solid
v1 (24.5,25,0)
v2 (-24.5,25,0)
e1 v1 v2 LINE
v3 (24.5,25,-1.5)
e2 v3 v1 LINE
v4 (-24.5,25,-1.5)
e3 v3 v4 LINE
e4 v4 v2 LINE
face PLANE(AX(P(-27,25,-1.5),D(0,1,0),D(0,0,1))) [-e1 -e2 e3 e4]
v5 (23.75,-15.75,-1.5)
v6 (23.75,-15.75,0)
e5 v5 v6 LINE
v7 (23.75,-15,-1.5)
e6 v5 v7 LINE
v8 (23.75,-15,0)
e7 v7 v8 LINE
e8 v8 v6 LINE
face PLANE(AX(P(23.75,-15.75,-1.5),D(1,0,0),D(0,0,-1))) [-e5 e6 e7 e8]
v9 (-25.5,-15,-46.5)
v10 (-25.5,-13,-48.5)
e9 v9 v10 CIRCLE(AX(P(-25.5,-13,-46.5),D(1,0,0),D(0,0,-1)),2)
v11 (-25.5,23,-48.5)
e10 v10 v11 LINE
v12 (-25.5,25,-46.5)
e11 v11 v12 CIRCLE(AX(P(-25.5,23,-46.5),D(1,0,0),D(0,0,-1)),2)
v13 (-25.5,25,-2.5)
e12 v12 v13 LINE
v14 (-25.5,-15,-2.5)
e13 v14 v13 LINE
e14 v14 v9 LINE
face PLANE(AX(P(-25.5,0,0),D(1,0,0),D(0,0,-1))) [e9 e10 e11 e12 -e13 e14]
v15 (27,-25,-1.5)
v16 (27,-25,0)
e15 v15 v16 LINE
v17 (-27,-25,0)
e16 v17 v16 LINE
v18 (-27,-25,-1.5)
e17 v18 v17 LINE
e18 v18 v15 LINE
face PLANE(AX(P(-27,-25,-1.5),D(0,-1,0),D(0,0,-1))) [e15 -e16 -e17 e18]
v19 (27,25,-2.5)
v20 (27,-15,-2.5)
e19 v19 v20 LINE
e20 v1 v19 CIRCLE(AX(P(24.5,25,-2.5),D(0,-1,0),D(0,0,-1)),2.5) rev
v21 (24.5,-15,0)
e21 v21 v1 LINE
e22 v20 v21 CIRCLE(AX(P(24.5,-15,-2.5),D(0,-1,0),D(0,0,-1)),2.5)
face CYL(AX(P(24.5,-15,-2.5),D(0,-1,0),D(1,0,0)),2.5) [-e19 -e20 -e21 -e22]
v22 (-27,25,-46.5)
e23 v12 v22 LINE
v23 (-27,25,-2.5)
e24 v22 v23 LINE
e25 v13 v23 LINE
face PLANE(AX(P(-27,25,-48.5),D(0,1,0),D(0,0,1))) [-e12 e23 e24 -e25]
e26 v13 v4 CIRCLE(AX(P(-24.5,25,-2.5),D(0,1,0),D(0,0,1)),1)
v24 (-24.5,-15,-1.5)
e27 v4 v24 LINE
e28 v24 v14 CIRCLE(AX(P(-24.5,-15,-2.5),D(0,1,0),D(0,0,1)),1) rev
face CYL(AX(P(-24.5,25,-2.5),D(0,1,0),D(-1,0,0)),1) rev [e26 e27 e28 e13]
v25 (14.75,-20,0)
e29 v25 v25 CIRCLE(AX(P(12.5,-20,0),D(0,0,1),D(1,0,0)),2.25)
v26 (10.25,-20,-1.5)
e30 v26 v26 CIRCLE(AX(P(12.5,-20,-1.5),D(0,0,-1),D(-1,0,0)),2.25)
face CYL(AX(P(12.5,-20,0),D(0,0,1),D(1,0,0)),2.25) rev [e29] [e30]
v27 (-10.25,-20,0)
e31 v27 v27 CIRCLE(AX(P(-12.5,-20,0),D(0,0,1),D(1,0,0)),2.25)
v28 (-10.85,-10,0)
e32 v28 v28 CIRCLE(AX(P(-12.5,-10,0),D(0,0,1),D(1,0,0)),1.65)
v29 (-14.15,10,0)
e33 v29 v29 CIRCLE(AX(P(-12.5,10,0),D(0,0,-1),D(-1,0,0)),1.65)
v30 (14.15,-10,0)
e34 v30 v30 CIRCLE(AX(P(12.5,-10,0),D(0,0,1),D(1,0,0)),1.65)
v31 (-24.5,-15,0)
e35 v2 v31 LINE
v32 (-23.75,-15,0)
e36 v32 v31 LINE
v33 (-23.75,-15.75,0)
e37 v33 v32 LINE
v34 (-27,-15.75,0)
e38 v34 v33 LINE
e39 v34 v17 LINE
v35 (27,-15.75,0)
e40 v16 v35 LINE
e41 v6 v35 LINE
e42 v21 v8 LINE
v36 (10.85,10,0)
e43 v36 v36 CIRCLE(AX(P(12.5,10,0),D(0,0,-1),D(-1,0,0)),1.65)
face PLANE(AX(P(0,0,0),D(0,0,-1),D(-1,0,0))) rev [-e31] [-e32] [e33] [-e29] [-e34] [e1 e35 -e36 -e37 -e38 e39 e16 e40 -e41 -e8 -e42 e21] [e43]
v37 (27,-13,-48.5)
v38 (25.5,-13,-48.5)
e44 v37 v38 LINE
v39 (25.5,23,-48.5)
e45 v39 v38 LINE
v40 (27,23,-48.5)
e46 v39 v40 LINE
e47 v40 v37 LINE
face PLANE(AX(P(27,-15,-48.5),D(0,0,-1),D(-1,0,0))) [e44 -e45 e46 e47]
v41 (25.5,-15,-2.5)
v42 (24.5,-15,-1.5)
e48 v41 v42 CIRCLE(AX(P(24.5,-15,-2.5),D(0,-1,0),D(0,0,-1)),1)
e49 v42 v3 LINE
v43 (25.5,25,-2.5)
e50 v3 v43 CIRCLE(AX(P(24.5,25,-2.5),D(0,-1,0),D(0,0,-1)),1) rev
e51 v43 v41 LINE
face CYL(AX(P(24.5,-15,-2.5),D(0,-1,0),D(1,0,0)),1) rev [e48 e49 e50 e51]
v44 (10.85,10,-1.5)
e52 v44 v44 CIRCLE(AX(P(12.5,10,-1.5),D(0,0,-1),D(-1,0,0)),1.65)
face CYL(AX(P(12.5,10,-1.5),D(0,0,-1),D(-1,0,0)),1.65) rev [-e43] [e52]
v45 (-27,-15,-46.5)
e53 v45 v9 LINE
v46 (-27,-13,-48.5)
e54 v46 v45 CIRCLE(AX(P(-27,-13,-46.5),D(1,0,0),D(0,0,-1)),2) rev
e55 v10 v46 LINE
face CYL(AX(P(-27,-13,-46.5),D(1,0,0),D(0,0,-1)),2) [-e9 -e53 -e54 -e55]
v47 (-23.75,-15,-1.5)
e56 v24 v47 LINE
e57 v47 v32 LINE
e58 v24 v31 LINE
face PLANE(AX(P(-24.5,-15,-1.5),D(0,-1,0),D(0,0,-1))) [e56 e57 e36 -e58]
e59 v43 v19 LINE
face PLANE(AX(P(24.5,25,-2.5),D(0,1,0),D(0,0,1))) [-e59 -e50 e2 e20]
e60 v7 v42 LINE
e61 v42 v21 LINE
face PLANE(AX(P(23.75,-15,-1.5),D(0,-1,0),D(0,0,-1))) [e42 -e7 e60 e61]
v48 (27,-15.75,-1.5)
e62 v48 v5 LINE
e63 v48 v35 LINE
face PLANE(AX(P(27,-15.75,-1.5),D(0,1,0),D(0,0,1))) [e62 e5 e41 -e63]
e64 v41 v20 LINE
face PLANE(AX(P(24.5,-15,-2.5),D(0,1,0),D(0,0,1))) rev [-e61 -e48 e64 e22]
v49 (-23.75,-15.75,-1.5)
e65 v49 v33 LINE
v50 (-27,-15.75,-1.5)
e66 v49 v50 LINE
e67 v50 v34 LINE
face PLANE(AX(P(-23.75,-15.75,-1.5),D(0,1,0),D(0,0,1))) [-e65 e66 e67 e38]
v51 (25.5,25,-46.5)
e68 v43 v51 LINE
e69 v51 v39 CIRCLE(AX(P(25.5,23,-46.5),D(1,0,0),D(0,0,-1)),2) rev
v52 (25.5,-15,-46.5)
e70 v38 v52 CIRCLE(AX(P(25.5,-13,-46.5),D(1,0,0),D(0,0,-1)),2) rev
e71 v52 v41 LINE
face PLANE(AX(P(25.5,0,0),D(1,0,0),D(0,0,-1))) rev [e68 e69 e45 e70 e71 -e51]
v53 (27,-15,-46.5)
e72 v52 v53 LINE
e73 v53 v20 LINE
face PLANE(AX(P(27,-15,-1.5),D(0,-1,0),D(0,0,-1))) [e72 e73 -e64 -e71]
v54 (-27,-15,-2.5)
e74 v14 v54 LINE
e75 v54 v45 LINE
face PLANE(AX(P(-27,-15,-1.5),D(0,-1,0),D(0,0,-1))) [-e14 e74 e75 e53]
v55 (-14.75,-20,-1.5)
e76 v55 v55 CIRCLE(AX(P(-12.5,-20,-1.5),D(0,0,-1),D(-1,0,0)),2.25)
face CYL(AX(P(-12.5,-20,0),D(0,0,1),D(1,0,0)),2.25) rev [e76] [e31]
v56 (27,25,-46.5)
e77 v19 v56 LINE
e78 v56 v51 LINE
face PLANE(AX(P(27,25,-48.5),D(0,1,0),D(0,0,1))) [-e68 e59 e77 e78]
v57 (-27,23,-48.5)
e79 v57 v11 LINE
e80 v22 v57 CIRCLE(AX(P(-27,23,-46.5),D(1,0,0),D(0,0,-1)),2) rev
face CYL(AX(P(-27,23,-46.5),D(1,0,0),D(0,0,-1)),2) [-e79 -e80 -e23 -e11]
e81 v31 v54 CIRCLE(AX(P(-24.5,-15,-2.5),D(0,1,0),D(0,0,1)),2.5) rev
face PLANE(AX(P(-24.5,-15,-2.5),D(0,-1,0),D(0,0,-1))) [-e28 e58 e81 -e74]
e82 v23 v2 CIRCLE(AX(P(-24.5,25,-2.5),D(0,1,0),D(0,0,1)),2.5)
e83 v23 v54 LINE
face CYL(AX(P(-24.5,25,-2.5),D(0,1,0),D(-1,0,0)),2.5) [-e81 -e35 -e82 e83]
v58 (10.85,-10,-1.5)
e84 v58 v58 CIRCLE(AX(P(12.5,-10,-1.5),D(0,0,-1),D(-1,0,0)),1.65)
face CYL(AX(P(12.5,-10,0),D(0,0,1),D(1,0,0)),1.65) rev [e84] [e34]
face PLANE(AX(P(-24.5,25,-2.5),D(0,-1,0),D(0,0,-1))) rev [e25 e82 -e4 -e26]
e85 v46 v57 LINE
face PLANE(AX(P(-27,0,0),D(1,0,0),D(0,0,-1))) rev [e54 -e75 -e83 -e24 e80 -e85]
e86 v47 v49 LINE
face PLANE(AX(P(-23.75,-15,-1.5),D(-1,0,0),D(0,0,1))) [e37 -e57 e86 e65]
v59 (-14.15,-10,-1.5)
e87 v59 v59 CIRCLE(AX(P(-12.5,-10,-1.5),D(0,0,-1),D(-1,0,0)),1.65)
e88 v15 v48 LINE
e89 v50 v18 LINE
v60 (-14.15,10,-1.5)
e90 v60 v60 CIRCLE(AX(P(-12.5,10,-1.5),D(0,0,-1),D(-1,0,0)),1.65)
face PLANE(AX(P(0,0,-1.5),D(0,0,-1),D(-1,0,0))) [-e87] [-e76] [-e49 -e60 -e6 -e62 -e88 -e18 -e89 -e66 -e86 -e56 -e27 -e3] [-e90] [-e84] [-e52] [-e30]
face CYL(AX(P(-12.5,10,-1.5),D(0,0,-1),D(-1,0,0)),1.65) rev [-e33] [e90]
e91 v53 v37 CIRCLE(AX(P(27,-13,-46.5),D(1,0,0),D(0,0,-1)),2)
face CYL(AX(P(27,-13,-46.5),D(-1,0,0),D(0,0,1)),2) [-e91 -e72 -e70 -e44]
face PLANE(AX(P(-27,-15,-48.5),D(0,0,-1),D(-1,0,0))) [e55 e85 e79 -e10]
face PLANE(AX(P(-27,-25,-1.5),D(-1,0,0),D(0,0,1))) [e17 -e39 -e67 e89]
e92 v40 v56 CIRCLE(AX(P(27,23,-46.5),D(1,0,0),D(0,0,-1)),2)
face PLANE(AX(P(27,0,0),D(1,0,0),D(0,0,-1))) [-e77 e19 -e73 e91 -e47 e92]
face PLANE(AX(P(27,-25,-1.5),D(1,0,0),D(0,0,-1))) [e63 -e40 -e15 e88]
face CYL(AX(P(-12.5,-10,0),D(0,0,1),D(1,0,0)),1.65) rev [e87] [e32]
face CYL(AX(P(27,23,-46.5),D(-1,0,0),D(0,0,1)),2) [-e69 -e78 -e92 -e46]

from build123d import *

# Parameters (mm, degrees)
SKETCH_1_W                          = 54
SKETCH_1_H                          = 50
SM_BASE_FLANGE_1_DEPTH              = 1.5
SM_EDGE_FLANGE_1_STRIP_W            = 8
SM_EDGE_FLANGE_1_STRIP_H            = 1.5
SM_EDGE_FLANGE_1_STRIP_CUT_DEPTH    = 40
SM_EDGE_FLANGE_1_RELIEF_W           = 8.75
SM_EDGE_FLANGE_1_RELIEF_H           = 0.75
SM_EDGE_FLANGE_1_RELIEF_CUT_DEPTH   = 1.5
SM_EDGE_FLANGE_1_STRIP_2_W          = 8
SM_EDGE_FLANGE_1_STRIP_2_H          = 1.5
SM_EDGE_FLANGE_1_STRIP_CUT_2_DEPTH  = 40
SM_EDGE_FLANGE_1_RELIEF_2_W         = 8.75
SM_EDGE_FLANGE_1_RELIEF_2_H         = 0.75
SM_EDGE_FLANGE_1_RELIEF_CUT_2_DEPTH = 1.5
SM_EDGE_FLANGE_1_DEPTH              = 40
SM_EDGE_FLANGE_1_BEND_DEPTH         = 40
HOLE_WIZARD_M4_1_D                  = 4.5
HOLE_WIZARD_M4_1_2_D                = 3.3
HOLE_WIZARD_M4_1_3_D                = 3.3
OTHER_START                         = -27
OTHER_1_DEPTH                       = 54


# Read off the part's stored shape, not the designer's step: 断开-边角1
# Sheet-metal steps are written as plain solids
with BuildPart() as part:
    # Sketch 1 → 基体-法兰1 (new body)
    with BuildSketch(Plane.XY):
        Rectangle(SKETCH_1_W, SKETCH_1_H)
    extrude(amount=-SM_BASE_FLANGE_1_DEPTH)

    # 边线-法兰1 strip (across the edge) → 边线-法兰1 strip cut (cut)
    with BuildSketch(Plane(origin=(27, 25, -1.5), x_dir=(-1, 0, 0), z_dir=(0, -1, 0))):
        with Locations((-1.5, -0.75)):
            Rectangle(SM_EDGE_FLANGE_1_STRIP_W, SM_EDGE_FLANGE_1_STRIP_H)
    extrude(amount=SM_EDGE_FLANGE_1_STRIP_CUT_DEPTH, mode=Mode.SUBTRACT)

    # 边线-法兰1 relief (on the sheet) → 边线-法兰1 relief cut (cut)
    with BuildSketch(Plane(origin=(24.5, 25, -1.5), x_dir=(-1, 0, 0), z_dir=(0, 0, -1))):
        with Locations((-3.625, -40.375)):
            Rectangle(SM_EDGE_FLANGE_1_RELIEF_W, SM_EDGE_FLANGE_1_RELIEF_H)
    extrude(amount=-SM_EDGE_FLANGE_1_RELIEF_CUT_DEPTH, mode=Mode.SUBTRACT)

    # 边线-法兰1 strip 2 (across the edge) → 边线-法兰1 strip cut 2 (cut)
    with BuildSketch(Plane(origin=(-27, -15, -1.5), x_dir=(1, 0, 0), z_dir=(0, 1, 0))):
        with Locations((-1.5, -0.75)):
            Rectangle(SM_EDGE_FLANGE_1_STRIP_2_W, SM_EDGE_FLANGE_1_STRIP_2_H)
    extrude(amount=SM_EDGE_FLANGE_1_STRIP_CUT_2_DEPTH, mode=Mode.SUBTRACT)

    # 边线-法兰1 relief 2 (on the sheet) → 边线-法兰1 relief cut 2 (cut)
    with BuildSketch(Plane(origin=(-24.5, -15, -1.5), x_dir=(1, 0, 0), z_dir=(0, 0, -1))):
        with Locations((-3.625, 0.375)):
            Rectangle(SM_EDGE_FLANGE_1_RELIEF_2_W, SM_EDGE_FLANGE_1_RELIEF_2_H)
    extrude(amount=-SM_EDGE_FLANGE_1_RELIEF_CUT_2_DEPTH, mode=Mode.SUBTRACT)

    # 边线-法兰1 section (across the edge) → 边线-法兰1 (add)
    with BuildSketch(Plane(origin=(27, 25, -1.5), x_dir=(-1, 0, 0), z_dir=(0, -1, 0))):
        with BuildLine():
            Line((0, 1), (0, 47))
            Line((0, 47), (1.5, 47))
            Line((1.5, 47), (1.5, 1))
            ThreePointArc((1.5, 1), (1.792893219, 0.292893219), (2.5, 0))
            Line((2.5, 0), (2.5, -1.5))
            ThreePointArc((2.5, -1.5), (0.732233047, -0.767766953), (0, 1))
        make_face()
    extrude(amount=SM_EDGE_FLANGE_1_DEPTH)

    # 边线-法兰1 section 2 (across the edge) → 边线-法兰1 bend (add)
    with BuildSketch(Plane(origin=(-27, -15, -1.5), x_dir=(1, 0, 0), z_dir=(0, 1, 0))):
        with BuildLine():
            Line((0, 1), (0, 47))
            Line((0, 47), (1.5, 47))
            Line((1.5, 47), (1.5, 1))
            ThreePointArc((1.5, 1), (1.792893219, 0.292893219), (2.5, 0))
            Line((2.5, 0), (2.5, -1.5))
            ThreePointArc((2.5, -1.5), (0.732233047, -0.767766953), (0, 1))
        make_face()
    extrude(amount=SM_EDGE_FLANGE_1_BEND_DEPTH)

    # Hole Wizard M4 _1 (through all)
    with Locations(Plane.XY):
        with Locations((-12.5, -20), (12.5, -20)):
            Hole(HOLE_WIZARD_M4_1_D / 2)

    # Hole Wizard M4 _1 2 (through all)
    with Locations(Plane(origin=(0, 0, -1.5), x_dir=(-1, 0, 0), z_dir=(0, 0, -1))):
        with Locations((-12.5, 10), (12.5, 10)):
            Hole(HOLE_WIZARD_M4_1_2_D / 2)

    # Hole Wizard M4 _1 3 (through all)
    with Locations(Plane.XY):
        with Locations((-12.5, -10), (12.5, -10)):
            Hole(HOLE_WIZARD_M4_1_3_D / 2)

    # Other 1 outline → Other 1 (cut)
    with BuildSketch(Plane.YZ.offset(OTHER_START)):
        with BuildLine():
            Line((-15, -48.5), (-13, -48.5))
            ThreePointArc((-13, -48.5), (-14.414213562, -47.914213562), (-15, -46.5))
            Line((-15, -46.5), (-15, -48.5))
        make_face()
        with BuildLine():
            ThreePointArc((25, -46.5), (24.414213562, -47.914213562), (23, -48.5))
            Line((23, -48.5), (25, -48.5))
            Line((25, -48.5), (25, -46.5))
        make_face()
    extrude(amount=OTHER_1_DEPTH, mode=Mode.SUBTRACT)


solid = part.part
